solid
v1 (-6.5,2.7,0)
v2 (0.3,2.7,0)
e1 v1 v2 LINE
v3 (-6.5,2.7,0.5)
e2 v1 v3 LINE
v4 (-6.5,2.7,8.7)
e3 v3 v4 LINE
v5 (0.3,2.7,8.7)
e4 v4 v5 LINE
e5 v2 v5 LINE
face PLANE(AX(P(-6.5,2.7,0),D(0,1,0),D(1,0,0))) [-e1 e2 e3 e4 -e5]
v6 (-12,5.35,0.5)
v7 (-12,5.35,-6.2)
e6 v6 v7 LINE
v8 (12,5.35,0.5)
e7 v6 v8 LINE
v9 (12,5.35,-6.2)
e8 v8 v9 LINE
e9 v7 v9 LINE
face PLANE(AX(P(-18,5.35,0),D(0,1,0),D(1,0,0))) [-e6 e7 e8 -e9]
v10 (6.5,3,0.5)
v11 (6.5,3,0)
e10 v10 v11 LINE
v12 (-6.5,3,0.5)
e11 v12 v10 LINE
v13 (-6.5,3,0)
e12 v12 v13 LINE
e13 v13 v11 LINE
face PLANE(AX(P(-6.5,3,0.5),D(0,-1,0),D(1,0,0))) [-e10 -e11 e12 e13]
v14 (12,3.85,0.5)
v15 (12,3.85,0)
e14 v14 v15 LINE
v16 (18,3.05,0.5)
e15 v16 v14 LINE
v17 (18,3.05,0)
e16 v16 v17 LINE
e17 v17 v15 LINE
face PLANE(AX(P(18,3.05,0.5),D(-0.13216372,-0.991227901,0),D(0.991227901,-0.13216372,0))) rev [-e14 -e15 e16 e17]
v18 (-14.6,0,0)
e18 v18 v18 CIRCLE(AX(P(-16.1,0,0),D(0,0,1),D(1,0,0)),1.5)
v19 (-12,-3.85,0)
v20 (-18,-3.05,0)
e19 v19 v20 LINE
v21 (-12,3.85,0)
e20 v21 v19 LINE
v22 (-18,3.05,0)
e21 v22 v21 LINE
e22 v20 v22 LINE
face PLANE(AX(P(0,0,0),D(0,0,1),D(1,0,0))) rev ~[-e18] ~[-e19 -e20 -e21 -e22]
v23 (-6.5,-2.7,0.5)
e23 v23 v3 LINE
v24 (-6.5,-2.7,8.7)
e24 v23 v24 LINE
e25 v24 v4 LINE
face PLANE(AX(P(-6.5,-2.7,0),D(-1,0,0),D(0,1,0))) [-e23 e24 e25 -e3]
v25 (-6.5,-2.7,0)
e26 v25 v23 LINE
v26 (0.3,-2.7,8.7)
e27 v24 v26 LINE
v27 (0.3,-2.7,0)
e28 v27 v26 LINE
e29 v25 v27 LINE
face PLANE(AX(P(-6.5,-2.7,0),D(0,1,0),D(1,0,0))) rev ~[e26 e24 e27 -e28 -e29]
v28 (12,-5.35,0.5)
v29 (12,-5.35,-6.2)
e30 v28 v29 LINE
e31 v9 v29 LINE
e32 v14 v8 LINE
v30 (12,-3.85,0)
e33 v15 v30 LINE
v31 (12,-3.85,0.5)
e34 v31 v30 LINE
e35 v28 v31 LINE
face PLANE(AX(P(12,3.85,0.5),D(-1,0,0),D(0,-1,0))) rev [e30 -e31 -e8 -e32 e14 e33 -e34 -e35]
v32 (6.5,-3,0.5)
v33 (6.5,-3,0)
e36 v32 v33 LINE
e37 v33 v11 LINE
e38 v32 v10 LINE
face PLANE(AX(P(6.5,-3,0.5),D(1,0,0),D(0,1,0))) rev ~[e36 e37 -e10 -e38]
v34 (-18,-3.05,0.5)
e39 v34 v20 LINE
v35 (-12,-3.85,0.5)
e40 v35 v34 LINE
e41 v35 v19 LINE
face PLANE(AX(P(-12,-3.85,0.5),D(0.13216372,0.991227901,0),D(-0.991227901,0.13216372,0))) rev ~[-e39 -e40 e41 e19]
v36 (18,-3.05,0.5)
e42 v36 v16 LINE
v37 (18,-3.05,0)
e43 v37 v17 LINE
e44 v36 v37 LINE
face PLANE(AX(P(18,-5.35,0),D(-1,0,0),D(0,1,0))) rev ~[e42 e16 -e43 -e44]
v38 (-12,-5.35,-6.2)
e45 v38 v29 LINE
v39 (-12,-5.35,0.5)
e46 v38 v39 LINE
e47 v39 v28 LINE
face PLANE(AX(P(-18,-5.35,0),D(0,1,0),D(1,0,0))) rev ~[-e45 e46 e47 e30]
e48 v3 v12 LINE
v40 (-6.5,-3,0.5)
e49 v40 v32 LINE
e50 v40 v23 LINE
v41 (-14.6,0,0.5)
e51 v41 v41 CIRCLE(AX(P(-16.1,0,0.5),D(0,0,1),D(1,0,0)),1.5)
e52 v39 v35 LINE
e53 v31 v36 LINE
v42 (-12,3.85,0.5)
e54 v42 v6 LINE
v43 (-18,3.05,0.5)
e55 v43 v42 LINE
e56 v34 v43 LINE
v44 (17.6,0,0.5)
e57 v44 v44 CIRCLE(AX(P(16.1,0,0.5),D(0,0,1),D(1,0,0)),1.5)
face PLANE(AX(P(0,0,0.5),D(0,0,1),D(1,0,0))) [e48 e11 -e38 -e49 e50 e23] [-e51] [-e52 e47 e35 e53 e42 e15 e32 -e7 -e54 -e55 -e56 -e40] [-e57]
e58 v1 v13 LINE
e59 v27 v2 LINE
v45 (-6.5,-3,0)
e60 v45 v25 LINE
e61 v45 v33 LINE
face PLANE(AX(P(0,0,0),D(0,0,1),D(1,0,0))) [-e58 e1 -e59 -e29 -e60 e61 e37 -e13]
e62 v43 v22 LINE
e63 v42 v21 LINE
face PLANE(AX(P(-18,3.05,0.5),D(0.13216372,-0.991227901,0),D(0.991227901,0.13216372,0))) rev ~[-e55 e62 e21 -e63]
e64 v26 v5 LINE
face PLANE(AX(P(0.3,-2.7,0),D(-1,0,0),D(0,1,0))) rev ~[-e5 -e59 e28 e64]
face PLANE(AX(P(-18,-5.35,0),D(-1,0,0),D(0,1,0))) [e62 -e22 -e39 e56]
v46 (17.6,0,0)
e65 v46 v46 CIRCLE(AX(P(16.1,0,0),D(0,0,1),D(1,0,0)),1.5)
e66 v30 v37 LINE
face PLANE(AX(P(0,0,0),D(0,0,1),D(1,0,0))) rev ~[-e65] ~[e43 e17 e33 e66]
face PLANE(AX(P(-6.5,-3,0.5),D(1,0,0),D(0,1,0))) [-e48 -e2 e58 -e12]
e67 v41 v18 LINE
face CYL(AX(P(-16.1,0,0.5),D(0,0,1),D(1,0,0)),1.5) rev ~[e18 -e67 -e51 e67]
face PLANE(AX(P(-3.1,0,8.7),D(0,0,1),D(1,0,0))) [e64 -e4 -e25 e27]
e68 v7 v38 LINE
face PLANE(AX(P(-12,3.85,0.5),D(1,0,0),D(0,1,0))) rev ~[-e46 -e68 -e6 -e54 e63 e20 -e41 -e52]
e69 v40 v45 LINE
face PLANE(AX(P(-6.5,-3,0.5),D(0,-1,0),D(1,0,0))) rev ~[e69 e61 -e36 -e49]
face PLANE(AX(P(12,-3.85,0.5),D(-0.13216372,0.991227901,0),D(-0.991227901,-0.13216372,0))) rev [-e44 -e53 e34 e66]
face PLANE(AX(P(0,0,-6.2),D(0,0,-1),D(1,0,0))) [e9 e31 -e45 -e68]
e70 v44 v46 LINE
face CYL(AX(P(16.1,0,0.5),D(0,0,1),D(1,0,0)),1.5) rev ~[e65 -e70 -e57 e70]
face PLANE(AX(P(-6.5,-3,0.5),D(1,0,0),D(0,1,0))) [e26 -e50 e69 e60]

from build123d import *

# Parameters (mm, degrees)
F0_W      = 36
F0_H      = 10.7
F1_DEPTH  = 0.5
F2_W      = 24
F2_H      = 10.7
F3_DEPTH  = 6.2
F4_W      = 13
F4_H      = 6
F5_DEPTH  = 0.5
F6_W      = 6.8
F6_H      = 5.4
F7_DEPTH  = 8.7
F8_R      = 1.5
F9_DEPTH  = 0.5
F11_DEPTH = 0.5


# Not quite as in the source:
# - a pattern or mirror of a feature is missing from the dataset's text; its kind, count and spacing are read off the source's solid


with BuildPart() as f1:
    # F0 (on Top) → F1 (new body)
    with BuildSketch(Plane.XY):
        Rectangle(F0_W, F0_H)
    extrude(amount=F1_DEPTH)

    # F2 (on face) → F3 (join)
    with BuildSketch(Plane(origin=(0, 0, 0), x_dir=(1, 0, 0), z_dir=(0, 0, -1))):
        Rectangle(F2_W, F2_H)
    extrude(amount=F3_DEPTH)

    # F4 (on face) → F5 (cut)
    with BuildSketch(Plane.XY.offset(0.5)):
        Rectangle(F4_W, F4_H)
    extrude(amount=-F5_DEPTH, mode=Mode.SUBTRACT)

    # F6 (on face) → F7 (join)
    with BuildSketch(Plane.XY):
        with Locations((-3.1, 0)):
            Rectangle(F6_W, F6_H)
    extrude(amount=F7_DEPTH)

    # F8 (on face) → F9 (cut, through all)
    with BuildSketch(Plane.XY.offset(0.5)):
        with Locations((-16.1, 0)):
            Circle(F8_R)
        with Locations((16.1, 0)):
            Circle(F8_R)
    extrude(amount=-F9_DEPTH, mode=Mode.SUBTRACT)

    # F10 (on face) → F11 (cut, through all)
    with BuildSketch(Plane.XY.offset(0.5)):
        Polygon((-12, 3.85), (-12, 5.35), (-18, 5.35), (-18, 3.05), align=None)
        Polygon((-12, -3.85), (-18, -3.05), (-18, -5.35), (-12, -5.35), align=None)
    f11 = extrude(amount=-F11_DEPTH, mode=Mode.SUBTRACT)

    # F11_copies: F11 across plane
    add(f11.mirror(Plane(origin=(0, 0, 0), x_dir=(0, 0, 1), z_dir=(1, 0, 0))), mode=Mode.SUBTRACT)


solid = f1.part
